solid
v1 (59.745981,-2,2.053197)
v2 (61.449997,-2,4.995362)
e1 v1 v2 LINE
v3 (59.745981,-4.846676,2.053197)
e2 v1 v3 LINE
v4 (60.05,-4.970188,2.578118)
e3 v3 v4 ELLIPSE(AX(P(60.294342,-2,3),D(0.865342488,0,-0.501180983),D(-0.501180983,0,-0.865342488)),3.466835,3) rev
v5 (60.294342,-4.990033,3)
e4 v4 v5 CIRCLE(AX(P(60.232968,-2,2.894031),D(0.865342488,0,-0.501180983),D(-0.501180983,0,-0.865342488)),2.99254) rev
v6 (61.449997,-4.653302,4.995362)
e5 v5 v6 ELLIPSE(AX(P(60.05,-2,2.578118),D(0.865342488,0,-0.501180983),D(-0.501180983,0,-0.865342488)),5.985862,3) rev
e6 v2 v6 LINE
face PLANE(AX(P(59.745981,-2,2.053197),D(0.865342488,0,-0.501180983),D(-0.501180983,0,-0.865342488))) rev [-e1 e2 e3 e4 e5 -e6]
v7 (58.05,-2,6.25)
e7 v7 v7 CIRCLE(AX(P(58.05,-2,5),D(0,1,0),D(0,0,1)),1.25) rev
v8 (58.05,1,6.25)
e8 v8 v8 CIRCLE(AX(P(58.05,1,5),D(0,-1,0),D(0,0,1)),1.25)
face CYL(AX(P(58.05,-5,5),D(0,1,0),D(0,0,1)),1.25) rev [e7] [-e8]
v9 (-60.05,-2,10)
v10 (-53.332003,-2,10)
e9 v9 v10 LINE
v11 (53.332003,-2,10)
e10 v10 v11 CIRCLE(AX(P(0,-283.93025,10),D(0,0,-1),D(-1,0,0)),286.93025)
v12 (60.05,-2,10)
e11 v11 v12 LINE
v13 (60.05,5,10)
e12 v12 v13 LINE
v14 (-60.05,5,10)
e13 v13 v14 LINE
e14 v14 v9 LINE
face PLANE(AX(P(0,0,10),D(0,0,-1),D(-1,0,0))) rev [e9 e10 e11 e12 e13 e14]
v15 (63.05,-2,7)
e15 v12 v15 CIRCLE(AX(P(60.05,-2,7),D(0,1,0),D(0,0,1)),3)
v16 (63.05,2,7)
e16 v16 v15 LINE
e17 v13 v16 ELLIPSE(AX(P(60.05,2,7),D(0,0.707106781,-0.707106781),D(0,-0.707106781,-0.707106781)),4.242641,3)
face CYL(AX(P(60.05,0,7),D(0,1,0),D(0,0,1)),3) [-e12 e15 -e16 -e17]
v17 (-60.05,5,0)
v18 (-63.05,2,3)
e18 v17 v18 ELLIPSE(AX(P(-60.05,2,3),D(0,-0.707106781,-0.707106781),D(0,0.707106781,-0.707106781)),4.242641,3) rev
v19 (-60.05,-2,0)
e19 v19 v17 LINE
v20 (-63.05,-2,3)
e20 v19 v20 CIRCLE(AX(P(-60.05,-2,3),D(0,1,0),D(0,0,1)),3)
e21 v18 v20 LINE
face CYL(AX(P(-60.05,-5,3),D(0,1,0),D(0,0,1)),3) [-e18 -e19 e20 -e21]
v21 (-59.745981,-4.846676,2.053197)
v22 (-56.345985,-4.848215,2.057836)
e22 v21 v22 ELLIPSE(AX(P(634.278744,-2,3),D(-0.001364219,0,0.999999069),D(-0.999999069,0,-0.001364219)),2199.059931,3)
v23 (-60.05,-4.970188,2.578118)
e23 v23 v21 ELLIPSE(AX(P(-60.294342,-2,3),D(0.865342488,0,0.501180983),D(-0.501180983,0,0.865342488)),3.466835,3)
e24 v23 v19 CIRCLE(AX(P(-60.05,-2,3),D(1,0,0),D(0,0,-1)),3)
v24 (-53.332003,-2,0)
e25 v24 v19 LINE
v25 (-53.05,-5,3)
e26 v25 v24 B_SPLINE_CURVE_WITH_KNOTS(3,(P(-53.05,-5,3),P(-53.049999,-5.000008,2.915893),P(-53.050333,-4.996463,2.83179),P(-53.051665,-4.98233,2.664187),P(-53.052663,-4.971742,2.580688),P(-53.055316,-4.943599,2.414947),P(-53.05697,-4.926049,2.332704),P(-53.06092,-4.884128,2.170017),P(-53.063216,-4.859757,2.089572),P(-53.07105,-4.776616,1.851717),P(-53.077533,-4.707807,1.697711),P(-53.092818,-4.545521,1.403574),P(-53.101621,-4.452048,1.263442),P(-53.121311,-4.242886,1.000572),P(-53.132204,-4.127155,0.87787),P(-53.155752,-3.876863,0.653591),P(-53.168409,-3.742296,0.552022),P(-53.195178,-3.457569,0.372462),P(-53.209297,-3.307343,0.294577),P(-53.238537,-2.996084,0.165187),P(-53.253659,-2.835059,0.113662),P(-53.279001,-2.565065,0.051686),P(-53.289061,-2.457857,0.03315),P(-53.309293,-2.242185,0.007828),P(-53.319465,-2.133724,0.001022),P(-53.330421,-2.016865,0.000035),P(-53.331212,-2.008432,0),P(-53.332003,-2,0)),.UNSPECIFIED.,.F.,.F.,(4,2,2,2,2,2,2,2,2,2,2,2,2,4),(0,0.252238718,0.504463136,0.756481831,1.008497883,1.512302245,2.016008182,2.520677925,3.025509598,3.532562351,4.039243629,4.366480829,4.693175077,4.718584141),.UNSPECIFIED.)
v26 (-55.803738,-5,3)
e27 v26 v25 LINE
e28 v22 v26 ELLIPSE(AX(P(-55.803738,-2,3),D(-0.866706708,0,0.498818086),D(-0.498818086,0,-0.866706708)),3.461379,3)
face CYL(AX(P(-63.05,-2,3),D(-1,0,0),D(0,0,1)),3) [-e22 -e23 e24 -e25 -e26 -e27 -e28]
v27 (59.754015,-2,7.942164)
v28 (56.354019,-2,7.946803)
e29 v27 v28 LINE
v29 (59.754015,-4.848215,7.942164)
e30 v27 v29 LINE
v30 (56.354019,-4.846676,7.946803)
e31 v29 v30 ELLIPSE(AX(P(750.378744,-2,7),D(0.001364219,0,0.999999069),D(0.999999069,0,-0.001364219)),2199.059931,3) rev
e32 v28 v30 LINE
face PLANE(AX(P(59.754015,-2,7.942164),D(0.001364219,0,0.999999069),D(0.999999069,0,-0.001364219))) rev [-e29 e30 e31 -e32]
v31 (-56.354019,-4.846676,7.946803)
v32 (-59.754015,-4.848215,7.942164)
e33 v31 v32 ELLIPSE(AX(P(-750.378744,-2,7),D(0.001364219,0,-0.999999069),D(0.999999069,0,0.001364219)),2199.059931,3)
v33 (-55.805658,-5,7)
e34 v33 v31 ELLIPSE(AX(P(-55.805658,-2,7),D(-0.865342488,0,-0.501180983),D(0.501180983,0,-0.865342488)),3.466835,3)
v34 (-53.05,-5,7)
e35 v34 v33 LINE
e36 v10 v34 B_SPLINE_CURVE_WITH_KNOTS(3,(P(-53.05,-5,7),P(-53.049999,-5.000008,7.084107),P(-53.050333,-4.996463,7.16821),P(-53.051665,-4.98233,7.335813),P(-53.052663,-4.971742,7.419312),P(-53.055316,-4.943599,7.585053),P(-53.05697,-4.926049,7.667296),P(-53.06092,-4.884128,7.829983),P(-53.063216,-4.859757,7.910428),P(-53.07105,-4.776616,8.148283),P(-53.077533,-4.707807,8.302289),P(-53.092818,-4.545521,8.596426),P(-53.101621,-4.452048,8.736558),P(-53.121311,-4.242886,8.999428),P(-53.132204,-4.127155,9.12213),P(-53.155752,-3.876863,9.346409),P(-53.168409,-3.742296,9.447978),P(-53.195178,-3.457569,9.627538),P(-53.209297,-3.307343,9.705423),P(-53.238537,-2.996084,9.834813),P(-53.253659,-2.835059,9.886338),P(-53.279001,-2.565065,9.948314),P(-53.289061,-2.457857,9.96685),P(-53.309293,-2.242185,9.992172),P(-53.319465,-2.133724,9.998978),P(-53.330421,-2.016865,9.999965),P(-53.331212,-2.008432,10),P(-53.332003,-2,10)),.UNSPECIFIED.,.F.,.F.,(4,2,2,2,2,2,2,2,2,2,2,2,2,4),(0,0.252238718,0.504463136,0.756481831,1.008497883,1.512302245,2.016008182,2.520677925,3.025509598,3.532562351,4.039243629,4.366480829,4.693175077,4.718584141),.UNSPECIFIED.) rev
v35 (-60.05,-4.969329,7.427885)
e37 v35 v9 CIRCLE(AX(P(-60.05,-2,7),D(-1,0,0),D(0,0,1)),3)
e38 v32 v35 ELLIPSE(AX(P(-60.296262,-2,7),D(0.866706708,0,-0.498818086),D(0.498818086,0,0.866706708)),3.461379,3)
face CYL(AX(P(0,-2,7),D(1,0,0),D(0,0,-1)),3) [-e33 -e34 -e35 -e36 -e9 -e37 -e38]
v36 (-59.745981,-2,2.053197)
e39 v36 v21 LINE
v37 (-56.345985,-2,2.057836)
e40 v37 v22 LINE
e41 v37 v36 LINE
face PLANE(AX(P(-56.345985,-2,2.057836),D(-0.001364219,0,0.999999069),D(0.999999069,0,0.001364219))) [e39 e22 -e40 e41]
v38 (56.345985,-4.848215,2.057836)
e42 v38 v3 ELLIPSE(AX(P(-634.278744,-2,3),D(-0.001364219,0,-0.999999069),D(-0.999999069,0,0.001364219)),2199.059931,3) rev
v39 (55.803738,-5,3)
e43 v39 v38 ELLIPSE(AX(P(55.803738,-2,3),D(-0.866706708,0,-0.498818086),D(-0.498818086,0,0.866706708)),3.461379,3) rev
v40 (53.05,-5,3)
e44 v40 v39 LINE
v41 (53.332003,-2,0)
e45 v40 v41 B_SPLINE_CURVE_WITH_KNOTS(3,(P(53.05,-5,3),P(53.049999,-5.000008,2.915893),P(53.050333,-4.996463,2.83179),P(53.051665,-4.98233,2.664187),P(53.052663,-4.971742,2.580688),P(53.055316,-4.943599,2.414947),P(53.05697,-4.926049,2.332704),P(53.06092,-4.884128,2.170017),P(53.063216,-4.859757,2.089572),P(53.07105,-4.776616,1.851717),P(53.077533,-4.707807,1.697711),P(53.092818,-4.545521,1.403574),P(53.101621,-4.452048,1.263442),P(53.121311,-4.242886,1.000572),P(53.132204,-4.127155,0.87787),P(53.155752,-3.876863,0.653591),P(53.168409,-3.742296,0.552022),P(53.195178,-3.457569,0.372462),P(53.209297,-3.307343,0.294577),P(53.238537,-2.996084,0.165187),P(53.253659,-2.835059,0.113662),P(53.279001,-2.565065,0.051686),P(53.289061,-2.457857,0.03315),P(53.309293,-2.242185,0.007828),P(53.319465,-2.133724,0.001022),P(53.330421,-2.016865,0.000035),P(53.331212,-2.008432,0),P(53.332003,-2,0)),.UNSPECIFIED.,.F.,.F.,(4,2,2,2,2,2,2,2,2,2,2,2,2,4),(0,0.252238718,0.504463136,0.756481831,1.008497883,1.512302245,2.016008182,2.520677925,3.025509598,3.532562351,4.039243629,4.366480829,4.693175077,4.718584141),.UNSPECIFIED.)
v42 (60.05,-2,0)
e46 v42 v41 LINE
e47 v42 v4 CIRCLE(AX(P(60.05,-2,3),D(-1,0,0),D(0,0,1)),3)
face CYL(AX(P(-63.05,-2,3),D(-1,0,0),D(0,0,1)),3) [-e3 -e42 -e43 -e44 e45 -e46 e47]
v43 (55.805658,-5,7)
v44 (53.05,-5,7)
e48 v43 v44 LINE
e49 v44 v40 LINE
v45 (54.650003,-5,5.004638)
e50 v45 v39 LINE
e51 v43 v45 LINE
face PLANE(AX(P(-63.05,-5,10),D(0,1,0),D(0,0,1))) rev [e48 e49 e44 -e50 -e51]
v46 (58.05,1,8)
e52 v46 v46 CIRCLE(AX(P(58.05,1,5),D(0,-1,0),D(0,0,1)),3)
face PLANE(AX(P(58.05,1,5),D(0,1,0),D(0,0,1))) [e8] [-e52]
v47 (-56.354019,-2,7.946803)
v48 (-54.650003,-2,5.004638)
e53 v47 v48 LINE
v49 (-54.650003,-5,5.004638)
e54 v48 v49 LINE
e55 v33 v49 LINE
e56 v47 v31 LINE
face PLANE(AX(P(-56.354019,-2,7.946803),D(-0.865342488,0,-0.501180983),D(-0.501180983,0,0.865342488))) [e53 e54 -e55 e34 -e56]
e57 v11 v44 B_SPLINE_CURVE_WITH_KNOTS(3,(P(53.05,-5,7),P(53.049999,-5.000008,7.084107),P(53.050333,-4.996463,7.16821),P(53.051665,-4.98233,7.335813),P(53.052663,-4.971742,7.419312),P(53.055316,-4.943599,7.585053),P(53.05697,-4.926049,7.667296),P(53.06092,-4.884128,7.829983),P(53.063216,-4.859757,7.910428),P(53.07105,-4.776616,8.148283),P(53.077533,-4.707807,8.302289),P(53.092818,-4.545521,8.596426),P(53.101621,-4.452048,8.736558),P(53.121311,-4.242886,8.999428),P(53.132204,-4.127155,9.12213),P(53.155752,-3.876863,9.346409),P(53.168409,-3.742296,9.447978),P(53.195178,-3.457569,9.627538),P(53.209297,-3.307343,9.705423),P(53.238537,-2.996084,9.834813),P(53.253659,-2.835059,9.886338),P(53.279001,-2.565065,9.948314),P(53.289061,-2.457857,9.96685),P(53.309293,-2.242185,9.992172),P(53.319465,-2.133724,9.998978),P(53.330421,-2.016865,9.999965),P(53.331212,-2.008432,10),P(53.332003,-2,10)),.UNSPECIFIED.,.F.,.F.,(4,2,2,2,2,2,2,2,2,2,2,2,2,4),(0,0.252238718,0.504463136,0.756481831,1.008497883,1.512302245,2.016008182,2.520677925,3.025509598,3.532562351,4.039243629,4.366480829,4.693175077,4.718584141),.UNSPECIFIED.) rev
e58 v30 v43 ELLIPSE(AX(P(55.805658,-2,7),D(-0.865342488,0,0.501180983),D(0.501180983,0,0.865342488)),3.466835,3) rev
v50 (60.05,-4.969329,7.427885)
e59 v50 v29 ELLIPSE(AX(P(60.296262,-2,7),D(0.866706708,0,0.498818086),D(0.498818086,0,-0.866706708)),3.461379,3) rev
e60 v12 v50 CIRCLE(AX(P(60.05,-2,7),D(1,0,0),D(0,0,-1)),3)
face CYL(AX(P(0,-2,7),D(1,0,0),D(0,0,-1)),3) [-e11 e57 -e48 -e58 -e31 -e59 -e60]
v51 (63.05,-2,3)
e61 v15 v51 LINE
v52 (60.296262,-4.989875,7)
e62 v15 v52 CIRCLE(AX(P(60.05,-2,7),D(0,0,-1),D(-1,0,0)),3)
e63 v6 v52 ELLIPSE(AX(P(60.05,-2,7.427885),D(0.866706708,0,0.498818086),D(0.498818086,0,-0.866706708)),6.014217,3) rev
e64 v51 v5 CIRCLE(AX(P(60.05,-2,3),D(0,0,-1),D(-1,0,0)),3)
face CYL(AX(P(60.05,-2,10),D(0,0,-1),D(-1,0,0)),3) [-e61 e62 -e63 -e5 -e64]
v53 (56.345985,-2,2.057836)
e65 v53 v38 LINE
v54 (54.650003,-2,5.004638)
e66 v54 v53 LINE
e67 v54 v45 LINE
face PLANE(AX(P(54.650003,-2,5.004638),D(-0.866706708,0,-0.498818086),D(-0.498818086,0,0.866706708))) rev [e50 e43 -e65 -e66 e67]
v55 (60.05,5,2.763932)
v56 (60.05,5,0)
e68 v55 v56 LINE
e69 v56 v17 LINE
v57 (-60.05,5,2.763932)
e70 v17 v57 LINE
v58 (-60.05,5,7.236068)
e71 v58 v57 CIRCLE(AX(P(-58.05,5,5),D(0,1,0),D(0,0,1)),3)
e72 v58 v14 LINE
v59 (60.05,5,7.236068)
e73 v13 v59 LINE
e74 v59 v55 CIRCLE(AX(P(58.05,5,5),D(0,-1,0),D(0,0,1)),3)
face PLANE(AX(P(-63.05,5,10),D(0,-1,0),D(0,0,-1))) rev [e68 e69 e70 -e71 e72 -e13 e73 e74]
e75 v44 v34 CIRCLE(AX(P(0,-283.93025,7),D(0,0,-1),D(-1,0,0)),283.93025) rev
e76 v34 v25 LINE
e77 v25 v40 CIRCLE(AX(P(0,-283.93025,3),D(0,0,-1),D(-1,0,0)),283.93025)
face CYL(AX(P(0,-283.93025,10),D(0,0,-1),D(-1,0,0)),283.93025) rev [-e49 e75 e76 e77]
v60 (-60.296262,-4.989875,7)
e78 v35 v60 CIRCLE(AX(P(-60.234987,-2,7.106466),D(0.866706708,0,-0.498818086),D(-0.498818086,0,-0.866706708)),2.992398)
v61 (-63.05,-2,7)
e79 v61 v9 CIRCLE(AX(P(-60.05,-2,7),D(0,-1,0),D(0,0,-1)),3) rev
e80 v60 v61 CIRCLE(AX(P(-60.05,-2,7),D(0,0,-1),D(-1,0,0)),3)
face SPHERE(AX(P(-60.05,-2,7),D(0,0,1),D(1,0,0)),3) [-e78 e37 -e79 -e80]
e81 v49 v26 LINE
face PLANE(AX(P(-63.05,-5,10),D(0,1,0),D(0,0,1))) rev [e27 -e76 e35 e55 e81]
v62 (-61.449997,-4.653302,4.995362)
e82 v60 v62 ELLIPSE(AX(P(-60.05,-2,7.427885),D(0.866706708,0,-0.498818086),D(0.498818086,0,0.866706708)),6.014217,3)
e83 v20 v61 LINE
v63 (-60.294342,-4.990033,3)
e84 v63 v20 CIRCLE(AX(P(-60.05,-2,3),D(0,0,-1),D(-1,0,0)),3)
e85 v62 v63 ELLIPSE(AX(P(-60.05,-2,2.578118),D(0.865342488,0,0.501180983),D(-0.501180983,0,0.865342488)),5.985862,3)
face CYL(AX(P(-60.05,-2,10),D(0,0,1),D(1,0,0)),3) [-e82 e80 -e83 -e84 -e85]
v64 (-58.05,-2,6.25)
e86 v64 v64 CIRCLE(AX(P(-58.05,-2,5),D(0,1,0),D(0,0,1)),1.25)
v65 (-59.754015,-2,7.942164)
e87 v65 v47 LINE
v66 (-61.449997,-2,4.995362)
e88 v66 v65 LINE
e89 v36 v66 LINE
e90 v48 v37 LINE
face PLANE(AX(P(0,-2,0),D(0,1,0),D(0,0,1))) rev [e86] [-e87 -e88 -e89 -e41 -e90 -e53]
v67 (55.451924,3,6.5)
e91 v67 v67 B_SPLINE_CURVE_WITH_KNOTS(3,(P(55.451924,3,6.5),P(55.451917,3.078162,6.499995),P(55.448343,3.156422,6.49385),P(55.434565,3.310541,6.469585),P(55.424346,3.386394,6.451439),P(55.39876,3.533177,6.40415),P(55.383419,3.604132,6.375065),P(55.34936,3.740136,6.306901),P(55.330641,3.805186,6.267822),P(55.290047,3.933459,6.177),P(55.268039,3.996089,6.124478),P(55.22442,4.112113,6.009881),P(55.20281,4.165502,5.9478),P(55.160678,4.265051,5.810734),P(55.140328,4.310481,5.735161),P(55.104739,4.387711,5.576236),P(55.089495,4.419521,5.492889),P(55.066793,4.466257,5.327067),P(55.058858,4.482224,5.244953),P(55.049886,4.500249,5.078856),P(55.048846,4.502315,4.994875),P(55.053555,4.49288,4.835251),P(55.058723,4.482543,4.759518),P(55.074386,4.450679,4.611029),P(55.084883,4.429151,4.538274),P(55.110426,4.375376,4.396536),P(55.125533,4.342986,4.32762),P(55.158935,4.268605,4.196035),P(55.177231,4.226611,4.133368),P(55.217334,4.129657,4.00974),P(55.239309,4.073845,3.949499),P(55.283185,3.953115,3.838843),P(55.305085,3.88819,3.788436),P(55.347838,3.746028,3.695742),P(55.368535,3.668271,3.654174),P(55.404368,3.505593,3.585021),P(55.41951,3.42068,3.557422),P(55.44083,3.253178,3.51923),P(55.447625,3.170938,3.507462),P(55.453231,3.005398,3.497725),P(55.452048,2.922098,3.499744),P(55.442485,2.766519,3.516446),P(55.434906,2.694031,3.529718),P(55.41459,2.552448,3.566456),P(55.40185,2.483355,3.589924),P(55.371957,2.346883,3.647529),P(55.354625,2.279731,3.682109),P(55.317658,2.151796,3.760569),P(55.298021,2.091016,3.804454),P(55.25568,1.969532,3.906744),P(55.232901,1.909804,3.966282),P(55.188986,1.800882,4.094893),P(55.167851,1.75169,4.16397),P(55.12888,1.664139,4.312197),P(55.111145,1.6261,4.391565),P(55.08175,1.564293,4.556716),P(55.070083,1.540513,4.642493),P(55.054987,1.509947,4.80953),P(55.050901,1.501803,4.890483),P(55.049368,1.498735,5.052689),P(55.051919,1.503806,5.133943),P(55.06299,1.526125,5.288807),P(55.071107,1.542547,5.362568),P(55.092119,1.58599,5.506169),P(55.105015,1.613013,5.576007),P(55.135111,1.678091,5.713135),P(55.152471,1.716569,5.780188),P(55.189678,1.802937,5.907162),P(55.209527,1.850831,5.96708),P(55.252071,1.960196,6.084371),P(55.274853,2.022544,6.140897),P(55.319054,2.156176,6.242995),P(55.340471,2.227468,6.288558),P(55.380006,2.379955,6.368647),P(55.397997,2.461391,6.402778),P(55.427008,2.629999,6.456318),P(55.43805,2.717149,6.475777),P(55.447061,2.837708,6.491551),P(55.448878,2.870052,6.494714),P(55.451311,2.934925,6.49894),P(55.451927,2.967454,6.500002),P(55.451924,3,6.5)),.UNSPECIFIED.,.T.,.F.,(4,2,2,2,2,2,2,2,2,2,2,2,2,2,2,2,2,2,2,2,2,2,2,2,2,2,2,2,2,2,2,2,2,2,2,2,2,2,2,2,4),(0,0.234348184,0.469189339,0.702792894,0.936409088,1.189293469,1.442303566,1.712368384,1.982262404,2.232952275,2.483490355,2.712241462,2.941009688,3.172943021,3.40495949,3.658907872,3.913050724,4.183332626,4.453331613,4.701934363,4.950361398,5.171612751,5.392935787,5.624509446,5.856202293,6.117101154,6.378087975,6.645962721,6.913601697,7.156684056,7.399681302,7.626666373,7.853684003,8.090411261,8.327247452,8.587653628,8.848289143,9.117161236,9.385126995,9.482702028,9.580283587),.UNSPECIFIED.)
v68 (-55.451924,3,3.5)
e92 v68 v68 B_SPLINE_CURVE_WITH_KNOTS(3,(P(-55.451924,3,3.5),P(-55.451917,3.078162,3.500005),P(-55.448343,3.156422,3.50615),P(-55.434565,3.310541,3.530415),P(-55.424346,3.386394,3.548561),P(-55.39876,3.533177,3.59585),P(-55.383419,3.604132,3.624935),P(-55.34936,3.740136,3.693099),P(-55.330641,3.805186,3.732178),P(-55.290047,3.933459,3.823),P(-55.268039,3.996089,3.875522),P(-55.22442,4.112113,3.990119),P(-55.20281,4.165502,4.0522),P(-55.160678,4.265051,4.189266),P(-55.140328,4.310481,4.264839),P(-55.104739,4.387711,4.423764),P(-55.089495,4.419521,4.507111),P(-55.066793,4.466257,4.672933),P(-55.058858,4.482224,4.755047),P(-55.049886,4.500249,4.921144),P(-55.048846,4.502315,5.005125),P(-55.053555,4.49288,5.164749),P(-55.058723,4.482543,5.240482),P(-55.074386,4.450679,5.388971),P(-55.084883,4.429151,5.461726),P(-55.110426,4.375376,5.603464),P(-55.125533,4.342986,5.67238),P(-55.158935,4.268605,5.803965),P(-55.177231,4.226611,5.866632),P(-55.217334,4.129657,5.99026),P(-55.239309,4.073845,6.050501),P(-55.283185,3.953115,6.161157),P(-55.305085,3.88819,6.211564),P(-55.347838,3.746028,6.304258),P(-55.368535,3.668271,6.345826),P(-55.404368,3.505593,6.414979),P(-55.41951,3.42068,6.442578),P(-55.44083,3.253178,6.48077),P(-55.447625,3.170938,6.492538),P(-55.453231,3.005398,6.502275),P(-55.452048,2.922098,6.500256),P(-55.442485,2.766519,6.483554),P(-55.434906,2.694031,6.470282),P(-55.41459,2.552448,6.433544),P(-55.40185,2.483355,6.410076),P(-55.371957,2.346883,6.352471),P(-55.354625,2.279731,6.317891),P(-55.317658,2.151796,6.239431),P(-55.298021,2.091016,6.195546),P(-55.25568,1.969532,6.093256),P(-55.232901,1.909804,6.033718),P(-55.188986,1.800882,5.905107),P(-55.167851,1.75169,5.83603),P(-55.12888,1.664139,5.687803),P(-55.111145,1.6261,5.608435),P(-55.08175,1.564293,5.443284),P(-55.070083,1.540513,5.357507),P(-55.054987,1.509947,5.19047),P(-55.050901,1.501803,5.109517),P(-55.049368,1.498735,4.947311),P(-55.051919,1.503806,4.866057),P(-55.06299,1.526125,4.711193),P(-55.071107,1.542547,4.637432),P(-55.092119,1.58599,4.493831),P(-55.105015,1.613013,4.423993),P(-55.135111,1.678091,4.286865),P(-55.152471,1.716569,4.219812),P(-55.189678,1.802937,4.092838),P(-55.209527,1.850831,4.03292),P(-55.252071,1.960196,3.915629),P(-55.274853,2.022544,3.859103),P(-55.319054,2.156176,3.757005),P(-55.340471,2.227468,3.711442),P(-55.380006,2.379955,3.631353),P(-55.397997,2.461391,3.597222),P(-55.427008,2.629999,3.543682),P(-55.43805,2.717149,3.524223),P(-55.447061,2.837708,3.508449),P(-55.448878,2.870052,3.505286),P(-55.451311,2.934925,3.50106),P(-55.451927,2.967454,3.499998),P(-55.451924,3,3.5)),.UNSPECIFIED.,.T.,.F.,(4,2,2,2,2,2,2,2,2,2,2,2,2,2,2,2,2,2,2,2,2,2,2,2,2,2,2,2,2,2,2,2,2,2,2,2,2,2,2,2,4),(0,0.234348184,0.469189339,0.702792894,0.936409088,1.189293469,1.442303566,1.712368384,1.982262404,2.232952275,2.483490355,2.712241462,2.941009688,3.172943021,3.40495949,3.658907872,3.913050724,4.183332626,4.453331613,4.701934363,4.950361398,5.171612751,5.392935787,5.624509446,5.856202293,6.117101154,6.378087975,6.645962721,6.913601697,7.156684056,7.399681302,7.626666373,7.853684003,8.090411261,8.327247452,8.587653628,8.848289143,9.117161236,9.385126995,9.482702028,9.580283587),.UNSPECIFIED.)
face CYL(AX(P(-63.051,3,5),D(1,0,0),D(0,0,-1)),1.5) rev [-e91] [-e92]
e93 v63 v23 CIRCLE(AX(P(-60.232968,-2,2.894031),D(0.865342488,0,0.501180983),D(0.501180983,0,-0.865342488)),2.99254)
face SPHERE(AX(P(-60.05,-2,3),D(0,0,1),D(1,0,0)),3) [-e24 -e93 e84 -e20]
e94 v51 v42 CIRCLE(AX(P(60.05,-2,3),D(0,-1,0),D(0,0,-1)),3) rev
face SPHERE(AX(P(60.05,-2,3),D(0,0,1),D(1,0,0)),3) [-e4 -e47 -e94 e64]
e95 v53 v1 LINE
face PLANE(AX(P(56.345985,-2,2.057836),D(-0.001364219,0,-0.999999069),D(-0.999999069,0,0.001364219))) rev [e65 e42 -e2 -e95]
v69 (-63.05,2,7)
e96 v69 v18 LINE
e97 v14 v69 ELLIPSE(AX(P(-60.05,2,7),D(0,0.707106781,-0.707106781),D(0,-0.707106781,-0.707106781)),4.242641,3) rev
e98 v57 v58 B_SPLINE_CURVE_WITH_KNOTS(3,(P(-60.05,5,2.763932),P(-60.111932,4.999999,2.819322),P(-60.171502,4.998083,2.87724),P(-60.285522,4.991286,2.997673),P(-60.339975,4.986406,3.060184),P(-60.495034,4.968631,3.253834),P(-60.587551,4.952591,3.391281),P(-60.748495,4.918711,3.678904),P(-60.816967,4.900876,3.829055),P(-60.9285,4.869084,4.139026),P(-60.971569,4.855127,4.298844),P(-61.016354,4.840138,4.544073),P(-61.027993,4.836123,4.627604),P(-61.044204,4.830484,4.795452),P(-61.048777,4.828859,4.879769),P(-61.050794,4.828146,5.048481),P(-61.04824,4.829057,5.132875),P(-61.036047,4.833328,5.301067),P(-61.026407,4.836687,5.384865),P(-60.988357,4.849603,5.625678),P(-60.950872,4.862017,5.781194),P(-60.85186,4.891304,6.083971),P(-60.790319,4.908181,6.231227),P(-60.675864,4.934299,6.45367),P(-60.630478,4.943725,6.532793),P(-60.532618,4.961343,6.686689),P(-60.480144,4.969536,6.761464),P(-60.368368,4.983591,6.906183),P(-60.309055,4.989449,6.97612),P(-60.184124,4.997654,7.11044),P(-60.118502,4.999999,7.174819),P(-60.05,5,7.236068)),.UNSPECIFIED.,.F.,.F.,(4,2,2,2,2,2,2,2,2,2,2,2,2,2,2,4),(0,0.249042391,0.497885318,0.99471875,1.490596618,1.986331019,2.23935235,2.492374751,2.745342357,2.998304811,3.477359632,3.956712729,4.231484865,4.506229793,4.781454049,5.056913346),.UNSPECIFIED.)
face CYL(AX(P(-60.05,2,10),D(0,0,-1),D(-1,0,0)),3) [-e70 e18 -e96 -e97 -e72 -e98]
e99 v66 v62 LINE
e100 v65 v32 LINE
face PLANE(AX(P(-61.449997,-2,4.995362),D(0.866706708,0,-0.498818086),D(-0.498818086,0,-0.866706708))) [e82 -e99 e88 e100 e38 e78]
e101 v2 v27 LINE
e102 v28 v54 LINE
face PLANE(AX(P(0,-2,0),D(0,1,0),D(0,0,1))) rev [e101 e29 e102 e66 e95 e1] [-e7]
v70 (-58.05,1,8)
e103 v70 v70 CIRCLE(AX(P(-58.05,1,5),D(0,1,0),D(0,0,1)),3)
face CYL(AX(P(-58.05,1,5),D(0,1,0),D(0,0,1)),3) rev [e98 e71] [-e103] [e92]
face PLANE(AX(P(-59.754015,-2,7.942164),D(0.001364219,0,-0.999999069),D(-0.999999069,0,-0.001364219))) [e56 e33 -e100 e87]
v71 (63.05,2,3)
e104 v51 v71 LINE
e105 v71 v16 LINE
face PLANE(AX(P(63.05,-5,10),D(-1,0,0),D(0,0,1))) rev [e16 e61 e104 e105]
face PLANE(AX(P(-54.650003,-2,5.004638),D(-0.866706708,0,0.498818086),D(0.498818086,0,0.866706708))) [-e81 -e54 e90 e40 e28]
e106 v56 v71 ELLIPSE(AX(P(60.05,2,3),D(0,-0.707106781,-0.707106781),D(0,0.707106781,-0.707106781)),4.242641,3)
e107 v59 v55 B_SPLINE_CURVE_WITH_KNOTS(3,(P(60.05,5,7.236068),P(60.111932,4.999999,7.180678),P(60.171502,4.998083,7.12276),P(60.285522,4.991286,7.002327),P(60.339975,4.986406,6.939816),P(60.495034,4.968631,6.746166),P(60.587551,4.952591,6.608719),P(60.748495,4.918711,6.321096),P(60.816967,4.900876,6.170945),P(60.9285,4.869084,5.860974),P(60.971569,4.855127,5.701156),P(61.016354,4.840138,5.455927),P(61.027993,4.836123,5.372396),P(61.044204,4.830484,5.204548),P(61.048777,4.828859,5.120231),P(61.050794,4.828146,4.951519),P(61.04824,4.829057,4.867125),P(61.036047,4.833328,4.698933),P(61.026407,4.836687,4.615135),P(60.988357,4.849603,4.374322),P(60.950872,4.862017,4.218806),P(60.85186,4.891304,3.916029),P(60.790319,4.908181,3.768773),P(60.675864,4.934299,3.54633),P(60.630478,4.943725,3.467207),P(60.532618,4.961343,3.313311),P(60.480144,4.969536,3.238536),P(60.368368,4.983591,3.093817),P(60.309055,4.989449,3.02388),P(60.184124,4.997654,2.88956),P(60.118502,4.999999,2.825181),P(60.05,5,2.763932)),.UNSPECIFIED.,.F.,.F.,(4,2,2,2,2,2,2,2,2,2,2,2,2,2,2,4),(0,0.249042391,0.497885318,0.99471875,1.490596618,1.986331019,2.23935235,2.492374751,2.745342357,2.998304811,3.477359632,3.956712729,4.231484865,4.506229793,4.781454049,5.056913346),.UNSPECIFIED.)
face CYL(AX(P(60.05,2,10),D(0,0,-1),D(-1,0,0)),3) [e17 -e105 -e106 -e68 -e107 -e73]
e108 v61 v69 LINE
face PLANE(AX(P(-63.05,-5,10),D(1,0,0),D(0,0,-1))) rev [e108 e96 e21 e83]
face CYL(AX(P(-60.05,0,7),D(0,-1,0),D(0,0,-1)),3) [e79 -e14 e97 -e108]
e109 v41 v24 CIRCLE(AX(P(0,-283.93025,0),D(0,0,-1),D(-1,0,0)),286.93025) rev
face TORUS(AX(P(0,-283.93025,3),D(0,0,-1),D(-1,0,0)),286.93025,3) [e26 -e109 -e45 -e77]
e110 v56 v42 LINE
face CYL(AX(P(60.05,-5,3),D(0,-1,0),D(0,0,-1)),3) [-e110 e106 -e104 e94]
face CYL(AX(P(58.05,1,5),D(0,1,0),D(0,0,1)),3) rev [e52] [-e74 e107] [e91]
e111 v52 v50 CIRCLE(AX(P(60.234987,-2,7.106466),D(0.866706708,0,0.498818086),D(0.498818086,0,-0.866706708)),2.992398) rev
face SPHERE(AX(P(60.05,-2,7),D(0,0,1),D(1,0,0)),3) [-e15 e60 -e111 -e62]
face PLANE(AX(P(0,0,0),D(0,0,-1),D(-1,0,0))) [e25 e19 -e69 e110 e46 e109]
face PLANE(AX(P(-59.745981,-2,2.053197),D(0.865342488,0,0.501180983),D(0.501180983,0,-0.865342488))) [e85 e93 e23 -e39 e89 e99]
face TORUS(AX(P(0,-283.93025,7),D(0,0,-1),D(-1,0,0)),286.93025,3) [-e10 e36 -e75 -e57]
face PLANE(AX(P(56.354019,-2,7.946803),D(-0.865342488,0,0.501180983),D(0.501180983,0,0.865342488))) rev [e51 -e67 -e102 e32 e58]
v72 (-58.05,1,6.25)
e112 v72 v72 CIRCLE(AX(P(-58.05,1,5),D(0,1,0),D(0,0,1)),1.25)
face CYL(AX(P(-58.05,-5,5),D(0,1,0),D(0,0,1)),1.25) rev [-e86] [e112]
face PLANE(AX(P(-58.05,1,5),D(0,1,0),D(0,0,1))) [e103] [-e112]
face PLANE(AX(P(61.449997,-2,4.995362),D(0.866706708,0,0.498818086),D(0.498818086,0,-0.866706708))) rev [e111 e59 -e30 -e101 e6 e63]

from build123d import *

# Parameters (mm, degrees)
ESBO_O1_W                              = 126.1
ESBO_O1_H                              = 10
RESSALTO_EXTRUS_O1_DEPTH               = 10
CORTE_EXTRUS_O1_DEPTH                  = 65.033604459
CORTE_EXTRUS_O3_DEPTH                  = 3
ESBO_O4_R                              = 3
CORTE_EXTRUS_O4_DEPTH                  = 4
ESBO_O5_R                              = 1.25
CORTE_EXTRUS_O5_DEPTH                  = 65.11943933
CORTE_EXTRUS_O9_REACH                  = 66.034
CORTE_EXTRUS_O9_END_RADIUS             = 3
ESBO_O6_R                              = 1.5
CORTE_EXTRUS_O9_DIRECTION_2_REACH      = 66.034
CORTE_EXTRUS_O9_DIRECTION_2_END_RADIUS = 3
FILETE1_R                              = 3
FILETE2_R                              = 3


with BuildPart() as part:
    # Esboço1 → Ressalto-extrusão1 (new body)
    with BuildSketch(Plane.XY):
        Rectangle(ESBO_O1_W, ESBO_O1_H)
    extrude(amount=RESSALTO_EXTRUS_O1_DEPTH)

    # Esboço2 → Corte-extrusão1 (cut, through all)
    with BuildSketch(Plane.XY.offset(10)):
        with BuildLine():
            Line((-291.82946292, -50.413684991), (-53.05, -5))
            ThreePointArc((-53.05, -5), (0, 0), (53.05, -5))
            Line((53.05, -5), (291.82946292, -50.413684991))
            Line((291.82946292, -50.413684991), (291.82946292, -536.533154655))
            Line((291.82946292, -536.533154655), (-291.82946292, -536.533154655))
            Line((-291.82946292, -536.533154655), (-291.82946292, -50.413684991))
        make_face()
    extrude(amount=-CORTE_EXTRUS_O1_DEPTH, mode=Mode.SUBTRACT)

    # Esboço3 → Corte-extrusão3 (cut)
    with BuildSketch(Plane(origin=(0, -5, 0), x_dir=(1, 0, 0), z_dir=(0, 1, 0))):
        Polygon((-56.354018507, -7.946802806), (-54.650003164, -5.004638346), (-56.345984657, -2.05783554), (-59.745981493, -2.053197194), (-61.449996836, -4.995361654), (-59.754015343, -7.94216446), align=None)
    corte_extrus_o3 = extrude(amount=CORTE_EXTRUS_O3_DEPTH, mode=Mode.SUBTRACT)

    # Esboço4 → Corte-extrusão4 (cut)
    with BuildSketch(Plane(origin=(0, 5, 0), x_dir=(1, 0, 0), z_dir=(0, 1, 0))):
        with Locations(Location((-58.05, -5, 0), (0, 0, 270))):
            Circle(ESBO_O4_R)
    corte_extrus_o4 = extrude(amount=-CORTE_EXTRUS_O4_DEPTH, mode=Mode.SUBTRACT)

    # Esboço5 → Corte-extrusão5 (cut, through all)
    with BuildSketch(Plane(origin=(0, 1, 0), x_dir=(1, 0, 0), z_dir=(0, 1, 0))):
        with Locations(Location((-58.05, -5, 0), (0, 0, 270))):
            Circle(ESBO_O5_R)
    corte_extrus_o5 = extrude(amount=-CORTE_EXTRUS_O5_DEPTH, mode=Mode.SUBTRACT)

    # Espelhar2: Corte-extrusão3, Corte-extrusão4, Corte-extrusão5 across plane
    add(corte_extrus_o3.mirror(Plane(origin=(0, 0, 0), x_dir=(0, 0, 1), z_dir=(1, 0, 0))), mode=Mode.SUBTRACT)
    add(corte_extrus_o4.mirror(Plane(origin=(0, 0, 0), x_dir=(0, 0, 1), z_dir=(1, 0, 0))), mode=Mode.SUBTRACT)
    add(corte_extrus_o5.mirror(Plane(origin=(0, 0, 0), x_dir=(0, 0, 1), z_dir=(1, 0, 0))), mode=Mode.SUBTRACT)

    # Corte-extrusão9: up to this cylinder (the profile starts outside it)
    corte_extrus_o9_end = Plane(origin=(58.05, 3, 5), z_dir=(0, 1, 0)) * Cylinder(CORTE_EXTRUS_O9_END_RADIUS, 139.068, mode=Mode.PRIVATE)
    # Esboço6 → Corte-extrusão9 (cut, up to the surface)
    with BuildSketch(Plane.ZY, mode=Mode.PRIVATE) as corte_extrus_o9_sk1:
        with Locations(Location((5, 3, 0), (0, 0, 180))):
            Circle(ESBO_O6_R)
    corte_extrus_o9_tool1 = extrude(corte_extrus_o9_sk1.sketch, amount=-CORTE_EXTRUS_O9_REACH, mode=Mode.PRIVATE) - corte_extrus_o9_end
    add(corte_extrus_o9_tool1.solids().sort_by_distance((0, 3, 5))[0], mode=Mode.SUBTRACT)

    # Corte-extrusão9 direction 2: up to this cylinder (the profile starts outside it)
    corte_extrus_o9_direction_2_end = Plane(origin=(-58.05, 3, 5), z_dir=(0, 1, 0)) * Cylinder(CORTE_EXTRUS_O9_DIRECTION_2_END_RADIUS, 139.068, mode=Mode.PRIVATE)
    # Esboço6 → Corte-extrusão9 direction 2 (cut, up to the surface)
    with BuildSketch(Plane.ZY, mode=Mode.PRIVATE) as corte_extrus_o9_direction_2_sk1:
        with Locations(Location((5, 3, 0), (0, 0, 180))):
            Circle(ESBO_O6_R)
    corte_extrus_o9_direction_2_tool1 = extrude(corte_extrus_o9_direction_2_sk1.sketch, amount=CORTE_EXTRUS_O9_DIRECTION_2_REACH, mode=Mode.PRIVATE) - corte_extrus_o9_direction_2_end
    add(corte_extrus_o9_direction_2_tool1.solids().sort_by_distance((0, 3, 5))[0], mode=Mode.SUBTRACT)

    # Filete1
    # the kernel refuses this fillet: 3 mm, written as the material it takes off along each edge
    with BuildSketch(Plane(origin=(-63.05, 12.5, 10), x_dir=(1, 0, 0), z_dir=(0, -1, 0)), Plane(origin=(-63.05, 12.5, 0), x_dir=(0, 0, 1), z_dir=(0, -1, 0)), Plane(origin=(63.05, -12.5, 0), x_dir=(0, 0, 1), z_dir=(0, 1, 0)), Plane(origin=(-63.05, 5, -7.5), x_dir=(1, 0, 0), z_dir=(0, 0, 1)), Plane(origin=(63.05, 5, -7.5), x_dir=(0, -1, 0), z_dir=(0, 0, 1))) as filete1_piece_1:
        with BuildLine():
            CenterArc((FILETE1_R, -FILETE1_R), FILETE1_R, 90, 90)
            Line((0, -FILETE1_R), (0, 0))
            Line((0, 0), (FILETE1_R, 0))
        make_face()
    extrude(amount=25, mode=Mode.SUBTRACT)
    with BuildSketch(Plane(origin=(63.05, -12.5, 10), x_dir=(0, 0, -1), z_dir=(0, 1, 0))) as filete1_piece_2:
        with BuildLine():
            CenterArc((FILETE1_R, FILETE1_R), FILETE1_R, 180, 90)
            Line((0, FILETE1_R), (0, 0))
            Line((0, 0), (FILETE1_R, 0))
        make_face()
    extrude(amount=25, mode=Mode.SUBTRACT)

    # Filete2
    # the kernel refuses this fillet: 3 mm, written as the material it takes off along each edge
    with BuildSketch(Plane(origin=(45.55, -5, 0), x_dir=(0, 1, 0), z_dir=(1, 0, 0)), Plane(origin=(-60.05, -5, 10), x_dir=(0, 0, -1), z_dir=(1, 0, 0))) as filete2_piece_1:
        with BuildLine():
            CenterArc((FILETE2_R, FILETE2_R), FILETE2_R, 180, 90)
            Line((0, FILETE2_R), (0, 0))
            Line((0, 0), (FILETE2_R, 0))
        make_face()
    extrude(amount=14.5, mode=Mode.SUBTRACT)
    with BuildSketch(Plane(origin=(45.55, -5, 10), x_dir=(0, 1, 0), z_dir=(1, 0, 0)), Plane(origin=(-60.05, -5, 0), x_dir=(0, 0, 1), z_dir=(1, 0, 0))) as filete2_piece_2:
        with BuildLine():
            CenterArc((FILETE2_R, -FILETE2_R), FILETE2_R, 90, 90)
            Line((0, -FILETE2_R), (0, 0))
            Line((0, 0), (FILETE2_R, 0))
        make_face()
    extrude(amount=14.5, mode=Mode.SUBTRACT)
    with BuildSketch(Plane(origin=(0, -283.93025, 0), x_dir=(0.21272383034714434, 0.9771123640617998, 0), z_dir=(0.9771123640617998, -0.21272383034714434, 0))) as filete2_piece_3:
        with BuildLine():
            CenterArc((283.93025 + FILETE2_R, FILETE2_R), FILETE2_R, 180, 90)
            Line((283.93025, FILETE2_R), (283.93025, 0))
            Line((283.93025, 0), (283.93025 + FILETE2_R, 0))
        make_face()
    revolve(axis=Axis((0, -283.93025, 0), (0, 0, 1)), revolution_arc=24.564047203, mode=Mode.SUBTRACT)
    with BuildSketch(Plane(origin=(0, -283.93025, 10), x_dir=(-0.21272383034714376, 0.9771123640618, 0), z_dir=(-0.9771123640618, -0.21272383034714376, 0))) as filete2_piece_4:
        with BuildLine():
            CenterArc((283.93025 + FILETE2_R, FILETE2_R), FILETE2_R, 180, 90)
            Line((283.93025 + FILETE2_R, 0), (283.93025, 0))
            Line((283.93025, 0), (283.93025, FILETE2_R))
        make_face()
    revolve(axis=Axis((0, -283.93025, 10), (0, 0, -1)), revolution_arc=24.564047203, mode=Mode.SUBTRACT)
    with BuildSketch(Plane(origin=(-60.05, -5, 3), x_dir=(0, 0, -1), z_dir=(1, 0, 0))) as filete2_piece_5:
        with BuildLine():
            CenterArc((3 - FILETE2_R, FILETE2_R), FILETE2_R, 270, 90)
            Line((3, FILETE2_R), (3, 0))
            Line((3, 0), (3 - FILETE2_R, 0))
        make_face()
    revolve(axis=Axis((-60.05, -5, 3), (0, 1, 0)), revolution_arc=90, mode=Mode.SUBTRACT)
    with BuildSketch(Plane(origin=(-63.05, -5, 3), x_dir=(1, 0, 0), z_dir=(0, 0, 1))) as filete2_piece_6:
        with BuildLine():
            CenterArc((FILETE2_R, FILETE2_R), FILETE2_R, 180, 90)
            Line((0, FILETE2_R), (0, 0))
            Line((0, 0), (FILETE2_R, 0))
        make_face()
    extrude(amount=4, mode=Mode.SUBTRACT)
    with BuildSketch(Plane(origin=(-60.05, -5, 7), x_dir=(-1, 0, 0), z_dir=(0, 0, -1))) as filete2_piece_7:
        with BuildLine():
            CenterArc((3 - FILETE2_R, FILETE2_R), FILETE2_R, 270, 90)
            Line((3, FILETE2_R), (3, 0))
            Line((3, 0), (3 - FILETE2_R, 0))
        make_face()
    revolve(axis=Axis((-60.05, -5, 7), (0, 1, 0)), revolution_arc=90, mode=Mode.SUBTRACT)
    with BuildSketch(Plane(origin=(60.05, -5, 7), x_dir=(1, 0, 0), z_dir=(0, 0, -1))) as filete2_piece_8:
        with BuildLine():
            CenterArc((3 - FILETE2_R, -FILETE2_R), FILETE2_R, 0, 90)
            Line((3, -FILETE2_R), (3, 0))
            Line((3, 0), (3 - FILETE2_R, 0))
        make_face()
    revolve(axis=Axis((60.05, -5, 7), (0, -1, 0)), revolution_arc=90, mode=Mode.SUBTRACT)
    with BuildSketch(Plane(origin=(63.05, -5, 3), x_dir=(-1, 0, 0), z_dir=(0, 0, 1))) as filete2_piece_9:
        with BuildLine():
            CenterArc((FILETE2_R, -FILETE2_R), FILETE2_R, 90, 90)
            Line((0, -FILETE2_R), (0, 0))
            Line((0, 0), (FILETE2_R, 0))
        make_face()
    extrude(amount=4, mode=Mode.SUBTRACT)
    with BuildSketch(Plane(origin=(60.05, -5, 3), x_dir=(0, 0, -1), z_dir=(-1, 0, 0))) as filete2_piece_10:
        with BuildLine():
            CenterArc((3 - FILETE2_R, -FILETE2_R), FILETE2_R, 0, 90)
            Line((3 - FILETE2_R, 0), (3, 0))
            Line((3, 0), (3, -FILETE2_R))
        make_face()
    revolve(axis=Axis((60.05, -5, 3), (0, -1, 0)), revolution_arc=90, mode=Mode.SUBTRACT)


solid = part.part
